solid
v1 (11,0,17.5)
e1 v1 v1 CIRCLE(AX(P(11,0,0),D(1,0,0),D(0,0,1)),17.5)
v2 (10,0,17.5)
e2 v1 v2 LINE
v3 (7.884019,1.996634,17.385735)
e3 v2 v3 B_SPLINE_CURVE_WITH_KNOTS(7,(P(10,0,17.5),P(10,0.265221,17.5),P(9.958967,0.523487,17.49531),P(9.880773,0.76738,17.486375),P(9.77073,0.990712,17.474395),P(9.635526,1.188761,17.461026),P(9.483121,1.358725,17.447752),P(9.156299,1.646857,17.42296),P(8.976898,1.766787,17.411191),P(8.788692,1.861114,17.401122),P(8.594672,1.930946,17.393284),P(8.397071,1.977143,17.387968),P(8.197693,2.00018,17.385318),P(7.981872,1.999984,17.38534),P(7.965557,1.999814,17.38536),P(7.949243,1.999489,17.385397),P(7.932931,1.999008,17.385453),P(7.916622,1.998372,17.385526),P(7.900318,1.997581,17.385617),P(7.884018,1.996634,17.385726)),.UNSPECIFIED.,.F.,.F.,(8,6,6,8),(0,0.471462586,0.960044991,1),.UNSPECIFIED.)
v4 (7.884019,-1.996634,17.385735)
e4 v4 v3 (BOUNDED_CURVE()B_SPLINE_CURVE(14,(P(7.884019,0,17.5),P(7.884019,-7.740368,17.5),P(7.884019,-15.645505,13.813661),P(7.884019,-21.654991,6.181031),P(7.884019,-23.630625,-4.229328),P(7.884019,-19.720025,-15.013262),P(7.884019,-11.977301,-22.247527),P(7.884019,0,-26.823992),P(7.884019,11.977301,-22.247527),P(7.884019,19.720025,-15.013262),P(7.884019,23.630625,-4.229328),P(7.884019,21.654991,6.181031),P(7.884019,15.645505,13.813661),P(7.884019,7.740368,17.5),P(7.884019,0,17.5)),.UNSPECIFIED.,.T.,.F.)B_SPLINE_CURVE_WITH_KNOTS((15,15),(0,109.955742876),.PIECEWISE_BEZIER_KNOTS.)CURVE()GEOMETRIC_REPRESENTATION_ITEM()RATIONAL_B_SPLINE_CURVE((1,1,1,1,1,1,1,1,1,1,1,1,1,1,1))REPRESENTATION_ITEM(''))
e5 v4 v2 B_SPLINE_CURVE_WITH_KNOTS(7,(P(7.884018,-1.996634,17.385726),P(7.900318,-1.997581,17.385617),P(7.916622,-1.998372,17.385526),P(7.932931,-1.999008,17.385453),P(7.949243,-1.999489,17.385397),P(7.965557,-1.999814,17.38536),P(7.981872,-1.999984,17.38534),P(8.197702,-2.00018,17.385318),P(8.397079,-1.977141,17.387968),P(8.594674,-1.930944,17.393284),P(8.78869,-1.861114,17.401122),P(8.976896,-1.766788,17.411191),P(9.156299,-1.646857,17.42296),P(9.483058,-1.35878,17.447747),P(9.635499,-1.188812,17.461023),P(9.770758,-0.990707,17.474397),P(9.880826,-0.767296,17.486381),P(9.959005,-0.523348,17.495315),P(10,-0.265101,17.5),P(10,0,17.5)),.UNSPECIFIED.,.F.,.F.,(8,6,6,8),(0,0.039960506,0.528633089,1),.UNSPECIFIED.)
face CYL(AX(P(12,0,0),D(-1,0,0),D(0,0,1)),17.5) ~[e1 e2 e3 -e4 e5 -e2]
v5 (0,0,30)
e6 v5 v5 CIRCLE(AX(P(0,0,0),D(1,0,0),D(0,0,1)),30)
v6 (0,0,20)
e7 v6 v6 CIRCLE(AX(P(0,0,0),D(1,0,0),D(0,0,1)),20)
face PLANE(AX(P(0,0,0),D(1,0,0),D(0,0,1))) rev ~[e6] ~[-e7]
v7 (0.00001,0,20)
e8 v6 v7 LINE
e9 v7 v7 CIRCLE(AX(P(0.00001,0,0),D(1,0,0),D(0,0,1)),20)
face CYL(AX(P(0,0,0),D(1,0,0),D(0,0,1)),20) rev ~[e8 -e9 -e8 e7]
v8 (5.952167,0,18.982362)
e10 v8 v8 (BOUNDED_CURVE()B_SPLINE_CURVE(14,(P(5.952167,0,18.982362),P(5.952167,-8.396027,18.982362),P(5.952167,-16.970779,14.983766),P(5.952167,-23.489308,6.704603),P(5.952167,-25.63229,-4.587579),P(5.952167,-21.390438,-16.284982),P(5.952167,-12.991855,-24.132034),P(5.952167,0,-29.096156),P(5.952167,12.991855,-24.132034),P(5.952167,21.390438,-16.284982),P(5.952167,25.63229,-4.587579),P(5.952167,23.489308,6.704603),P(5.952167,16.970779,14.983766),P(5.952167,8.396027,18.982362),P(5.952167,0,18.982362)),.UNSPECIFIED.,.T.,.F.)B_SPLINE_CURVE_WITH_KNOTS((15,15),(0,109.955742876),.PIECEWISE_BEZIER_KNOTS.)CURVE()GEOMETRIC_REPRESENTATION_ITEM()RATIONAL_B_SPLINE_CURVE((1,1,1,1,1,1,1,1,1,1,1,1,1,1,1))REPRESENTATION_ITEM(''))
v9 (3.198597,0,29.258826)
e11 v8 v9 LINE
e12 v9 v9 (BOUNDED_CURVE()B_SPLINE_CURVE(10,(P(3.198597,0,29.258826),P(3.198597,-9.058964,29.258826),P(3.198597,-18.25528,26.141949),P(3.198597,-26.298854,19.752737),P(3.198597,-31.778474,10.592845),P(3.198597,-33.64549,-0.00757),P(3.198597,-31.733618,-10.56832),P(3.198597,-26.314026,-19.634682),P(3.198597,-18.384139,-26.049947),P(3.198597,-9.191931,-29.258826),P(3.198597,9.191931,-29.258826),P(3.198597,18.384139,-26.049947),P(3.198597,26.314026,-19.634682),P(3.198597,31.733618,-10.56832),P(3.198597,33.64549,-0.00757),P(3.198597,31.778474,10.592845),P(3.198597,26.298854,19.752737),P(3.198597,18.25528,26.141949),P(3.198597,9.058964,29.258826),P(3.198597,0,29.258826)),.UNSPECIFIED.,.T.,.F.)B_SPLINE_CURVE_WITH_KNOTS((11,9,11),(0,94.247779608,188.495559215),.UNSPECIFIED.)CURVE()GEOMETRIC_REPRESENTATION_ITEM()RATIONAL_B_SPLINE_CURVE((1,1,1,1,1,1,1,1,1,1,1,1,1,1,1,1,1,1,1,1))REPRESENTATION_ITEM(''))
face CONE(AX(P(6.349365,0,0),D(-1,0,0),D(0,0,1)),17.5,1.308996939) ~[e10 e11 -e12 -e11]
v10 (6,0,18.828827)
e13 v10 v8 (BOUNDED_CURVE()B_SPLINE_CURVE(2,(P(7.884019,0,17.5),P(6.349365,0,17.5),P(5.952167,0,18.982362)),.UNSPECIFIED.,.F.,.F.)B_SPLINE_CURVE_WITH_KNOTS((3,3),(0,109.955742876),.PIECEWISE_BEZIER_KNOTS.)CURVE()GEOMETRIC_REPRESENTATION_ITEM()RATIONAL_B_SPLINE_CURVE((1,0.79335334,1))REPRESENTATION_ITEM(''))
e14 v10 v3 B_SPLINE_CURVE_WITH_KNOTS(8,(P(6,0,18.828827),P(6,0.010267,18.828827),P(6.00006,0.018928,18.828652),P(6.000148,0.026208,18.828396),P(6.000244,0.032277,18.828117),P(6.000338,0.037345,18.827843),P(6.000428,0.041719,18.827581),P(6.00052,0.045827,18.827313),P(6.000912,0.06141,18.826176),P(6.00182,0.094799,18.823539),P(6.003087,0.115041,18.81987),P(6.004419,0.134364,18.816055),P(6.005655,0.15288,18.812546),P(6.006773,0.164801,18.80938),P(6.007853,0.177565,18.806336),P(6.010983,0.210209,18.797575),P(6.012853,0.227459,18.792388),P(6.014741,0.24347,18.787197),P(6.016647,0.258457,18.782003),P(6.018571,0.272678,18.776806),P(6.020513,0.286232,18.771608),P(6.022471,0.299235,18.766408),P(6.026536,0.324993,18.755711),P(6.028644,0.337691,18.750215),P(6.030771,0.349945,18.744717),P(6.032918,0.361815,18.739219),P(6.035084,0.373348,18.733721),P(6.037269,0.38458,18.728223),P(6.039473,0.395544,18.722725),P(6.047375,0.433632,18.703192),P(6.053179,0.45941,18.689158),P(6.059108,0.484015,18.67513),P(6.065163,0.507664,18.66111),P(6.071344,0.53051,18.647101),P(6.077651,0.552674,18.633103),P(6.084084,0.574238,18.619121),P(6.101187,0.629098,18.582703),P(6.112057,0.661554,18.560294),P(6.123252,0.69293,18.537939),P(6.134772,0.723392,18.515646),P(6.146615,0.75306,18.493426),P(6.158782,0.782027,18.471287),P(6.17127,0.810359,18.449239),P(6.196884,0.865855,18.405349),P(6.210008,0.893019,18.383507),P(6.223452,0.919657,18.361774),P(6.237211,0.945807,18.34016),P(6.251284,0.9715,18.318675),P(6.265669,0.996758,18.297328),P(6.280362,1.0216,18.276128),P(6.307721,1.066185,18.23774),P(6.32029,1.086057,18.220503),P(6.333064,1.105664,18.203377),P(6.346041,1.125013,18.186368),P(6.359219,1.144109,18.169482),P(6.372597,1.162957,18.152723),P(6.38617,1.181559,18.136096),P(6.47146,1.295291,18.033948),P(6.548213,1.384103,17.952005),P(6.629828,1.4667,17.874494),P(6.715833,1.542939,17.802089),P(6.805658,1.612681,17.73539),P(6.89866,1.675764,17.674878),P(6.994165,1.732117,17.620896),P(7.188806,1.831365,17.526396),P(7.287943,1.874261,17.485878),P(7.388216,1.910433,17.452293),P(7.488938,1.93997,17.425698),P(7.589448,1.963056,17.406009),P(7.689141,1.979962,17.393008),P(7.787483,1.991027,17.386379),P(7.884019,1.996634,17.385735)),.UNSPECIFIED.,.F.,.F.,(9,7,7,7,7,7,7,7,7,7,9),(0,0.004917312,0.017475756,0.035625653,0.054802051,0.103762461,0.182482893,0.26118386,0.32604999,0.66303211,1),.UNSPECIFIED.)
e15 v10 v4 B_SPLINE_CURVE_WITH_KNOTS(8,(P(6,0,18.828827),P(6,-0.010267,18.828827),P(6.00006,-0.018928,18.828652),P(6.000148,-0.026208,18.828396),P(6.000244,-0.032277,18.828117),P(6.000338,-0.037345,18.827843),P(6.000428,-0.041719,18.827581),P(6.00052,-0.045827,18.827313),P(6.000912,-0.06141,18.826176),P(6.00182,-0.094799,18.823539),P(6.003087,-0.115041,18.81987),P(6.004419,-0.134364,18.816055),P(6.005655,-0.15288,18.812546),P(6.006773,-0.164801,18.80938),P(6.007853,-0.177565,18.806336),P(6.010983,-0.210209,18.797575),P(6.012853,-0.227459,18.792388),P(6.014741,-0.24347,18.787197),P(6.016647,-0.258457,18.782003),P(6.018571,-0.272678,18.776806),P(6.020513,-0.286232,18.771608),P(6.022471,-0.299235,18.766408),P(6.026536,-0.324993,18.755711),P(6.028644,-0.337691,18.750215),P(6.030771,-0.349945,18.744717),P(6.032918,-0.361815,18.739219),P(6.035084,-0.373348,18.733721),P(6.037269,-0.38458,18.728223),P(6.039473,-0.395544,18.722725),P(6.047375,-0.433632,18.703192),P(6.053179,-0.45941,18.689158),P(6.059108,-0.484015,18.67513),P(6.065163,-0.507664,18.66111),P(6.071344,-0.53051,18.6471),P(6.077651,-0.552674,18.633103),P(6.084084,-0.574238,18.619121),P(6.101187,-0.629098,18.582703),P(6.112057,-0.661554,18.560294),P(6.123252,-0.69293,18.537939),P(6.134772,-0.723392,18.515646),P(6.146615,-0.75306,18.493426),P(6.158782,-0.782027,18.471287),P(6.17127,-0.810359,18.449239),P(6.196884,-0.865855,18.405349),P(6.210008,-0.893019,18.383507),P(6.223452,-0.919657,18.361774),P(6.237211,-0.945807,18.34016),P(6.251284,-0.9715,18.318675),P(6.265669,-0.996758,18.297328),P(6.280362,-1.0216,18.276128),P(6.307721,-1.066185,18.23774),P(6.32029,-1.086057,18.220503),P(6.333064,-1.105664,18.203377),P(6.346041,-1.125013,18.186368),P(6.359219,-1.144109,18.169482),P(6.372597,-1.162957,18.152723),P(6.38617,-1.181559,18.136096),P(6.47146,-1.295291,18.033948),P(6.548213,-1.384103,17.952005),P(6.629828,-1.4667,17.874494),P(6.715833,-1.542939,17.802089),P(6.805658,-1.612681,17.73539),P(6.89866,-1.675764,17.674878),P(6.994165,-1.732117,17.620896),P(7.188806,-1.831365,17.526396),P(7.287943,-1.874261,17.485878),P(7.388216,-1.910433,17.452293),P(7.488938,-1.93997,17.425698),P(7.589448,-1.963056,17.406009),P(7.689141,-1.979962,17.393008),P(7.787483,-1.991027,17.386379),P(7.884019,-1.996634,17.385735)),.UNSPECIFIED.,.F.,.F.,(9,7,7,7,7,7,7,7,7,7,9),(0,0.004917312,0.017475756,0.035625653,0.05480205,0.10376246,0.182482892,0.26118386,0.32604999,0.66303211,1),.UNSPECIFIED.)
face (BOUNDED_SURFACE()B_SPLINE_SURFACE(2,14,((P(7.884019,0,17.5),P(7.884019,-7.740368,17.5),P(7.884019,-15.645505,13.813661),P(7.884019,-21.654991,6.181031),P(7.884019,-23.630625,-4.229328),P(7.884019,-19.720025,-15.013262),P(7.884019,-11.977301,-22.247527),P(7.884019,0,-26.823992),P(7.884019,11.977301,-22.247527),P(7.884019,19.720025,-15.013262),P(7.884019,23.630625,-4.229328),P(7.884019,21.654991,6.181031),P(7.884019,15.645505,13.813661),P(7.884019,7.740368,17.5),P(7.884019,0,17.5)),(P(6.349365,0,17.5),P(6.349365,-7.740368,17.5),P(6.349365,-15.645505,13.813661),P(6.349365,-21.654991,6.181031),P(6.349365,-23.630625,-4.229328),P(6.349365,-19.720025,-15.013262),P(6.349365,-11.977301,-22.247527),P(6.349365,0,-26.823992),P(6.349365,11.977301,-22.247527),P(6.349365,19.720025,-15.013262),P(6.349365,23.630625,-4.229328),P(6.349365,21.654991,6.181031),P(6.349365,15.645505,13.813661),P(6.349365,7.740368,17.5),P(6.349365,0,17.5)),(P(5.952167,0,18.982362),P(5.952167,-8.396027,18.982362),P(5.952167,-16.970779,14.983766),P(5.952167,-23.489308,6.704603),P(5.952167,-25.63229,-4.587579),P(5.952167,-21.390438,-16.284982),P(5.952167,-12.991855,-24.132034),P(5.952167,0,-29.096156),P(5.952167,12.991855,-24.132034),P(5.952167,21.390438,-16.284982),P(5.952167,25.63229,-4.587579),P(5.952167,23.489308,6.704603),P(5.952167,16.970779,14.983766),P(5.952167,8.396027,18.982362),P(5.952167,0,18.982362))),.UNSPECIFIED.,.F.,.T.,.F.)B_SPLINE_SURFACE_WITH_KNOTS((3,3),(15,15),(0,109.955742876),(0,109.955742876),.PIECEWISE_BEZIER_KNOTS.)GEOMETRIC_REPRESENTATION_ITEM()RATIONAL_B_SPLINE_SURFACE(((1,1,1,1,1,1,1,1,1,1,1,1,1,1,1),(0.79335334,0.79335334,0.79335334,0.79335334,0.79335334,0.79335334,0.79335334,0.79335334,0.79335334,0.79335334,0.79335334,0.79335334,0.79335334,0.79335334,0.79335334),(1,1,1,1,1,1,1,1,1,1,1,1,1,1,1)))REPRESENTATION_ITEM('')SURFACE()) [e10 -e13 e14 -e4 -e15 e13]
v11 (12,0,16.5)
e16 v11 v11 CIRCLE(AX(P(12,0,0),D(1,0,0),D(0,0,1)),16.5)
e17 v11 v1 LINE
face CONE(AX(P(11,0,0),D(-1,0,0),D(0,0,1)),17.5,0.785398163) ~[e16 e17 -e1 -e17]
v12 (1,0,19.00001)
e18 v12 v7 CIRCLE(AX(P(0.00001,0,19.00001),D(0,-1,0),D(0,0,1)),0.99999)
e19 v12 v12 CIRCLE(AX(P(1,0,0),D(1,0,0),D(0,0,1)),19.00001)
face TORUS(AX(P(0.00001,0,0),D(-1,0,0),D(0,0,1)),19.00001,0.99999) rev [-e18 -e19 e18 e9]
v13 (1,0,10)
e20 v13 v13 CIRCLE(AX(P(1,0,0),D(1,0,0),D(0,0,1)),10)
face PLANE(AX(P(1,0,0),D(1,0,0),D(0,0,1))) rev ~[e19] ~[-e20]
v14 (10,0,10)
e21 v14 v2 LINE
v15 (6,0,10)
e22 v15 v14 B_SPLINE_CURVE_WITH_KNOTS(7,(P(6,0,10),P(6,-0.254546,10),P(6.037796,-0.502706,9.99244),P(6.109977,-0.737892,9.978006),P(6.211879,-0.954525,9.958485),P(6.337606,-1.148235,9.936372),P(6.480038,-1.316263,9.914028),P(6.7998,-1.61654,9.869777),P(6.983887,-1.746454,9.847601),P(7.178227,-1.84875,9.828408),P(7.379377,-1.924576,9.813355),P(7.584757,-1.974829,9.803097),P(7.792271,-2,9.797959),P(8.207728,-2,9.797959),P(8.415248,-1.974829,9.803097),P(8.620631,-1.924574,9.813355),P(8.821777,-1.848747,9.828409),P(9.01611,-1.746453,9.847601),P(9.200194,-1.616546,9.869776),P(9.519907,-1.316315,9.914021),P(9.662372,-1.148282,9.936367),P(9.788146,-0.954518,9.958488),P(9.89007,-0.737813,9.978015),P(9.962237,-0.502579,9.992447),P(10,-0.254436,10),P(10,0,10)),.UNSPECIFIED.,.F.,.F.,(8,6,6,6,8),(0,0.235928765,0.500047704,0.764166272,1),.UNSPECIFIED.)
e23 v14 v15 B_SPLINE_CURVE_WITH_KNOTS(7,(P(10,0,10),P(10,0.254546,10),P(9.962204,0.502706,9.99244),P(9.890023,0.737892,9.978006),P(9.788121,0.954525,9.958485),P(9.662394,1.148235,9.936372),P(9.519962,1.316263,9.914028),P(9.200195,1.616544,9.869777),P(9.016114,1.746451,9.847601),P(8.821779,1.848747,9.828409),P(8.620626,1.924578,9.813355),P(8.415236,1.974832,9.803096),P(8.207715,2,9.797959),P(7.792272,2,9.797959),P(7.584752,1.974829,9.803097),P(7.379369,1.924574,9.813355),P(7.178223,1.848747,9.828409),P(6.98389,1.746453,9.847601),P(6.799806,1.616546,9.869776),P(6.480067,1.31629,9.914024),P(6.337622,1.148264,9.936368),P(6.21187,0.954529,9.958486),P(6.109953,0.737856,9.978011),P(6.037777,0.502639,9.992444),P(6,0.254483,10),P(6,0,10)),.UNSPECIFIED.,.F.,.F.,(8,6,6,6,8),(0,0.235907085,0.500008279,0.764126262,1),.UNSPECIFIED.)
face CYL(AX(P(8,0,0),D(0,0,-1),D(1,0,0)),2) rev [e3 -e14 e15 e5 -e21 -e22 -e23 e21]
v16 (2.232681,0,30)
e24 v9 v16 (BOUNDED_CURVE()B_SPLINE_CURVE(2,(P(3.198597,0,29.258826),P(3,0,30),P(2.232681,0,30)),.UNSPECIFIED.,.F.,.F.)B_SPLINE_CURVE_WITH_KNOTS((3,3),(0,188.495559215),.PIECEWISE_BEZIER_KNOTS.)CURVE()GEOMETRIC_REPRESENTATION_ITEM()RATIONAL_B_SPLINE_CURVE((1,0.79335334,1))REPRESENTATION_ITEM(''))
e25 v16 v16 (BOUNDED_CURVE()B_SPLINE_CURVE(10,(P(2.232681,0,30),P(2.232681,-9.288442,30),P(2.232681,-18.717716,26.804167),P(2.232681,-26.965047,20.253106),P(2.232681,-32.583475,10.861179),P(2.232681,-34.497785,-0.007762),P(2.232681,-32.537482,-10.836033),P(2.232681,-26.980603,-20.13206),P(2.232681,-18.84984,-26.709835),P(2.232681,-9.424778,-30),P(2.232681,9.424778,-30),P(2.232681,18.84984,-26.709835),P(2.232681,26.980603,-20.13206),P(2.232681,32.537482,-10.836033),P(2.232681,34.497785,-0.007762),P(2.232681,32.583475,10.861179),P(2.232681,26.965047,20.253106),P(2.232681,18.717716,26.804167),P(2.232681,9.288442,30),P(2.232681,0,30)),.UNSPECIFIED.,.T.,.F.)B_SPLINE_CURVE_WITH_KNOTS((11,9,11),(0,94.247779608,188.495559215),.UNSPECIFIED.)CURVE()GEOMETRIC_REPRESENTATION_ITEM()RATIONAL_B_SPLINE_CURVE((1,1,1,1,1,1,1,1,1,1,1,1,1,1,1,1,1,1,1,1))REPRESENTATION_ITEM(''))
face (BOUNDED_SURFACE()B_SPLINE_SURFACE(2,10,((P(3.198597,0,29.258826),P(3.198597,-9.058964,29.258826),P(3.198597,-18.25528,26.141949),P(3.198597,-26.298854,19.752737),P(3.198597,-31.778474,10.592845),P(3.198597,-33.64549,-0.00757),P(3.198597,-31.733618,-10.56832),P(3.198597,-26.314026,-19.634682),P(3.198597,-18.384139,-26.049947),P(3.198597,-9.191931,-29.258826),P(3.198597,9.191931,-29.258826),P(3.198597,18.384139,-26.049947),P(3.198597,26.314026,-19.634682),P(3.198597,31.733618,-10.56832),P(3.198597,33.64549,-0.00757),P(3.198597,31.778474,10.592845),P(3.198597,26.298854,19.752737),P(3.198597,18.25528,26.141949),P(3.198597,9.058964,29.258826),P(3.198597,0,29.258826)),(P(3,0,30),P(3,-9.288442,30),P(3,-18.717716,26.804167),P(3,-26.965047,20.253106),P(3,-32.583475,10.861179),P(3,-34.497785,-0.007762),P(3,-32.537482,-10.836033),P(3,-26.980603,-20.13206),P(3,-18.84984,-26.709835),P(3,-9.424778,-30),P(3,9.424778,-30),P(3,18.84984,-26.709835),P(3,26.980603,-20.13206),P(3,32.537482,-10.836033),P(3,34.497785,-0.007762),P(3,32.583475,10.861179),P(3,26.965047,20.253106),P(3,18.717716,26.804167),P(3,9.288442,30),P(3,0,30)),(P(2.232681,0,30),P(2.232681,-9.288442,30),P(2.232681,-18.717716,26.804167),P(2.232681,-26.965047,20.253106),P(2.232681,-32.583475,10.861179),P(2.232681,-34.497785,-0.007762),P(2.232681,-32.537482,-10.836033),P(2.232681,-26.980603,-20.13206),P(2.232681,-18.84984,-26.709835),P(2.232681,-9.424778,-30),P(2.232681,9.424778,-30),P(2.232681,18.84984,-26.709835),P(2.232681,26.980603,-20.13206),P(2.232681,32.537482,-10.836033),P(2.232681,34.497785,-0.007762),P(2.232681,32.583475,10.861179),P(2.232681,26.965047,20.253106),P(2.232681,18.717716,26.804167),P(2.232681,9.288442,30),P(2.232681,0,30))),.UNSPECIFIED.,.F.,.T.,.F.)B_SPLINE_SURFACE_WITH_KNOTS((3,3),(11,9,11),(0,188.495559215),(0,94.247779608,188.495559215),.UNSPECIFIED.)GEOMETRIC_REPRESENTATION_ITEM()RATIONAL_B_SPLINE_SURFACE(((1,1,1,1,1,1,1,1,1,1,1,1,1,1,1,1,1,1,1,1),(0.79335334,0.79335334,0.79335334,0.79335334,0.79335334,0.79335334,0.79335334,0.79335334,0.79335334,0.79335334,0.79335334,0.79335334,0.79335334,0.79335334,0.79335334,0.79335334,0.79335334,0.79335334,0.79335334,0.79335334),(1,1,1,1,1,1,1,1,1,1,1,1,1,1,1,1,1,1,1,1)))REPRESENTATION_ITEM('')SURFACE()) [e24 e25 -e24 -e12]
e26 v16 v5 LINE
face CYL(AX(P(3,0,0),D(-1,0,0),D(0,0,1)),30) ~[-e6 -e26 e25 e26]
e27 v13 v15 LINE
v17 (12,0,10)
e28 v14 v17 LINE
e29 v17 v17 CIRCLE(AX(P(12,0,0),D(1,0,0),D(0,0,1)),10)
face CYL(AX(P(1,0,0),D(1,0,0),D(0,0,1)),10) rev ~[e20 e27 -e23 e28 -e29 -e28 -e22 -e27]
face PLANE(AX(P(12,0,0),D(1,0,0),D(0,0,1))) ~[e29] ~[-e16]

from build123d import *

# Parameters (mm, degrees)
F2_SIZE  = 1
F3_R     = 0.99999
F4_R     = 2
F5_R     = 2
F6_DEPTH = 30.0010001


# Not quite as in the source:
# - a fillet or chamfer is up to 0.001 mm smaller than in the source, because OpenCascade refuses the exact size


with BuildPart() as f1:
    # F0 (on Front) → F1 (revolve)
    with BuildSketch(Plane.XZ):
        Polygon((0, 30), (0, 20), (1, 20), (1, 10), (12, 10), (12, 17.5), (6.3493649054, 17.5), (3, 30), align=None)
    revolve(axis=Axis((7.1844396027, 0, 0), (1, 0, 0)))

    # F2
    f2_edges = [f1.edges().sort_by_distance(p)[0] for p in [
        (12, 0, -17.5),
    ]]
    chamfer(f2_edges, length=F2_SIZE)

    # F3 (radius 1 in the source; OpenCascade refuses exactly that, so slightly less here)
    f3_edges = [f1.edges().sort_by_distance(p)[0] for p in [
        (3, 0, -30),
        (1, 0, -20),
    ]]
    fillet(f3_edges, radius=F3_R)

    # F4
    f4_edges = [f1.edges().sort_by_distance(p)[0] for p in [
        (6.349365, 0, -17.5),
    ]]
    fillet(f4_edges, radius=F4_R)

    # F5 (on Top) → F6 (cut, through all)
    with BuildSketch(Plane.XY):
        with Locations((8, 0)):
            Circle(F5_R)
    extrude(amount=F6_DEPTH, mode=Mode.SUBTRACT)


solid = f1.part
